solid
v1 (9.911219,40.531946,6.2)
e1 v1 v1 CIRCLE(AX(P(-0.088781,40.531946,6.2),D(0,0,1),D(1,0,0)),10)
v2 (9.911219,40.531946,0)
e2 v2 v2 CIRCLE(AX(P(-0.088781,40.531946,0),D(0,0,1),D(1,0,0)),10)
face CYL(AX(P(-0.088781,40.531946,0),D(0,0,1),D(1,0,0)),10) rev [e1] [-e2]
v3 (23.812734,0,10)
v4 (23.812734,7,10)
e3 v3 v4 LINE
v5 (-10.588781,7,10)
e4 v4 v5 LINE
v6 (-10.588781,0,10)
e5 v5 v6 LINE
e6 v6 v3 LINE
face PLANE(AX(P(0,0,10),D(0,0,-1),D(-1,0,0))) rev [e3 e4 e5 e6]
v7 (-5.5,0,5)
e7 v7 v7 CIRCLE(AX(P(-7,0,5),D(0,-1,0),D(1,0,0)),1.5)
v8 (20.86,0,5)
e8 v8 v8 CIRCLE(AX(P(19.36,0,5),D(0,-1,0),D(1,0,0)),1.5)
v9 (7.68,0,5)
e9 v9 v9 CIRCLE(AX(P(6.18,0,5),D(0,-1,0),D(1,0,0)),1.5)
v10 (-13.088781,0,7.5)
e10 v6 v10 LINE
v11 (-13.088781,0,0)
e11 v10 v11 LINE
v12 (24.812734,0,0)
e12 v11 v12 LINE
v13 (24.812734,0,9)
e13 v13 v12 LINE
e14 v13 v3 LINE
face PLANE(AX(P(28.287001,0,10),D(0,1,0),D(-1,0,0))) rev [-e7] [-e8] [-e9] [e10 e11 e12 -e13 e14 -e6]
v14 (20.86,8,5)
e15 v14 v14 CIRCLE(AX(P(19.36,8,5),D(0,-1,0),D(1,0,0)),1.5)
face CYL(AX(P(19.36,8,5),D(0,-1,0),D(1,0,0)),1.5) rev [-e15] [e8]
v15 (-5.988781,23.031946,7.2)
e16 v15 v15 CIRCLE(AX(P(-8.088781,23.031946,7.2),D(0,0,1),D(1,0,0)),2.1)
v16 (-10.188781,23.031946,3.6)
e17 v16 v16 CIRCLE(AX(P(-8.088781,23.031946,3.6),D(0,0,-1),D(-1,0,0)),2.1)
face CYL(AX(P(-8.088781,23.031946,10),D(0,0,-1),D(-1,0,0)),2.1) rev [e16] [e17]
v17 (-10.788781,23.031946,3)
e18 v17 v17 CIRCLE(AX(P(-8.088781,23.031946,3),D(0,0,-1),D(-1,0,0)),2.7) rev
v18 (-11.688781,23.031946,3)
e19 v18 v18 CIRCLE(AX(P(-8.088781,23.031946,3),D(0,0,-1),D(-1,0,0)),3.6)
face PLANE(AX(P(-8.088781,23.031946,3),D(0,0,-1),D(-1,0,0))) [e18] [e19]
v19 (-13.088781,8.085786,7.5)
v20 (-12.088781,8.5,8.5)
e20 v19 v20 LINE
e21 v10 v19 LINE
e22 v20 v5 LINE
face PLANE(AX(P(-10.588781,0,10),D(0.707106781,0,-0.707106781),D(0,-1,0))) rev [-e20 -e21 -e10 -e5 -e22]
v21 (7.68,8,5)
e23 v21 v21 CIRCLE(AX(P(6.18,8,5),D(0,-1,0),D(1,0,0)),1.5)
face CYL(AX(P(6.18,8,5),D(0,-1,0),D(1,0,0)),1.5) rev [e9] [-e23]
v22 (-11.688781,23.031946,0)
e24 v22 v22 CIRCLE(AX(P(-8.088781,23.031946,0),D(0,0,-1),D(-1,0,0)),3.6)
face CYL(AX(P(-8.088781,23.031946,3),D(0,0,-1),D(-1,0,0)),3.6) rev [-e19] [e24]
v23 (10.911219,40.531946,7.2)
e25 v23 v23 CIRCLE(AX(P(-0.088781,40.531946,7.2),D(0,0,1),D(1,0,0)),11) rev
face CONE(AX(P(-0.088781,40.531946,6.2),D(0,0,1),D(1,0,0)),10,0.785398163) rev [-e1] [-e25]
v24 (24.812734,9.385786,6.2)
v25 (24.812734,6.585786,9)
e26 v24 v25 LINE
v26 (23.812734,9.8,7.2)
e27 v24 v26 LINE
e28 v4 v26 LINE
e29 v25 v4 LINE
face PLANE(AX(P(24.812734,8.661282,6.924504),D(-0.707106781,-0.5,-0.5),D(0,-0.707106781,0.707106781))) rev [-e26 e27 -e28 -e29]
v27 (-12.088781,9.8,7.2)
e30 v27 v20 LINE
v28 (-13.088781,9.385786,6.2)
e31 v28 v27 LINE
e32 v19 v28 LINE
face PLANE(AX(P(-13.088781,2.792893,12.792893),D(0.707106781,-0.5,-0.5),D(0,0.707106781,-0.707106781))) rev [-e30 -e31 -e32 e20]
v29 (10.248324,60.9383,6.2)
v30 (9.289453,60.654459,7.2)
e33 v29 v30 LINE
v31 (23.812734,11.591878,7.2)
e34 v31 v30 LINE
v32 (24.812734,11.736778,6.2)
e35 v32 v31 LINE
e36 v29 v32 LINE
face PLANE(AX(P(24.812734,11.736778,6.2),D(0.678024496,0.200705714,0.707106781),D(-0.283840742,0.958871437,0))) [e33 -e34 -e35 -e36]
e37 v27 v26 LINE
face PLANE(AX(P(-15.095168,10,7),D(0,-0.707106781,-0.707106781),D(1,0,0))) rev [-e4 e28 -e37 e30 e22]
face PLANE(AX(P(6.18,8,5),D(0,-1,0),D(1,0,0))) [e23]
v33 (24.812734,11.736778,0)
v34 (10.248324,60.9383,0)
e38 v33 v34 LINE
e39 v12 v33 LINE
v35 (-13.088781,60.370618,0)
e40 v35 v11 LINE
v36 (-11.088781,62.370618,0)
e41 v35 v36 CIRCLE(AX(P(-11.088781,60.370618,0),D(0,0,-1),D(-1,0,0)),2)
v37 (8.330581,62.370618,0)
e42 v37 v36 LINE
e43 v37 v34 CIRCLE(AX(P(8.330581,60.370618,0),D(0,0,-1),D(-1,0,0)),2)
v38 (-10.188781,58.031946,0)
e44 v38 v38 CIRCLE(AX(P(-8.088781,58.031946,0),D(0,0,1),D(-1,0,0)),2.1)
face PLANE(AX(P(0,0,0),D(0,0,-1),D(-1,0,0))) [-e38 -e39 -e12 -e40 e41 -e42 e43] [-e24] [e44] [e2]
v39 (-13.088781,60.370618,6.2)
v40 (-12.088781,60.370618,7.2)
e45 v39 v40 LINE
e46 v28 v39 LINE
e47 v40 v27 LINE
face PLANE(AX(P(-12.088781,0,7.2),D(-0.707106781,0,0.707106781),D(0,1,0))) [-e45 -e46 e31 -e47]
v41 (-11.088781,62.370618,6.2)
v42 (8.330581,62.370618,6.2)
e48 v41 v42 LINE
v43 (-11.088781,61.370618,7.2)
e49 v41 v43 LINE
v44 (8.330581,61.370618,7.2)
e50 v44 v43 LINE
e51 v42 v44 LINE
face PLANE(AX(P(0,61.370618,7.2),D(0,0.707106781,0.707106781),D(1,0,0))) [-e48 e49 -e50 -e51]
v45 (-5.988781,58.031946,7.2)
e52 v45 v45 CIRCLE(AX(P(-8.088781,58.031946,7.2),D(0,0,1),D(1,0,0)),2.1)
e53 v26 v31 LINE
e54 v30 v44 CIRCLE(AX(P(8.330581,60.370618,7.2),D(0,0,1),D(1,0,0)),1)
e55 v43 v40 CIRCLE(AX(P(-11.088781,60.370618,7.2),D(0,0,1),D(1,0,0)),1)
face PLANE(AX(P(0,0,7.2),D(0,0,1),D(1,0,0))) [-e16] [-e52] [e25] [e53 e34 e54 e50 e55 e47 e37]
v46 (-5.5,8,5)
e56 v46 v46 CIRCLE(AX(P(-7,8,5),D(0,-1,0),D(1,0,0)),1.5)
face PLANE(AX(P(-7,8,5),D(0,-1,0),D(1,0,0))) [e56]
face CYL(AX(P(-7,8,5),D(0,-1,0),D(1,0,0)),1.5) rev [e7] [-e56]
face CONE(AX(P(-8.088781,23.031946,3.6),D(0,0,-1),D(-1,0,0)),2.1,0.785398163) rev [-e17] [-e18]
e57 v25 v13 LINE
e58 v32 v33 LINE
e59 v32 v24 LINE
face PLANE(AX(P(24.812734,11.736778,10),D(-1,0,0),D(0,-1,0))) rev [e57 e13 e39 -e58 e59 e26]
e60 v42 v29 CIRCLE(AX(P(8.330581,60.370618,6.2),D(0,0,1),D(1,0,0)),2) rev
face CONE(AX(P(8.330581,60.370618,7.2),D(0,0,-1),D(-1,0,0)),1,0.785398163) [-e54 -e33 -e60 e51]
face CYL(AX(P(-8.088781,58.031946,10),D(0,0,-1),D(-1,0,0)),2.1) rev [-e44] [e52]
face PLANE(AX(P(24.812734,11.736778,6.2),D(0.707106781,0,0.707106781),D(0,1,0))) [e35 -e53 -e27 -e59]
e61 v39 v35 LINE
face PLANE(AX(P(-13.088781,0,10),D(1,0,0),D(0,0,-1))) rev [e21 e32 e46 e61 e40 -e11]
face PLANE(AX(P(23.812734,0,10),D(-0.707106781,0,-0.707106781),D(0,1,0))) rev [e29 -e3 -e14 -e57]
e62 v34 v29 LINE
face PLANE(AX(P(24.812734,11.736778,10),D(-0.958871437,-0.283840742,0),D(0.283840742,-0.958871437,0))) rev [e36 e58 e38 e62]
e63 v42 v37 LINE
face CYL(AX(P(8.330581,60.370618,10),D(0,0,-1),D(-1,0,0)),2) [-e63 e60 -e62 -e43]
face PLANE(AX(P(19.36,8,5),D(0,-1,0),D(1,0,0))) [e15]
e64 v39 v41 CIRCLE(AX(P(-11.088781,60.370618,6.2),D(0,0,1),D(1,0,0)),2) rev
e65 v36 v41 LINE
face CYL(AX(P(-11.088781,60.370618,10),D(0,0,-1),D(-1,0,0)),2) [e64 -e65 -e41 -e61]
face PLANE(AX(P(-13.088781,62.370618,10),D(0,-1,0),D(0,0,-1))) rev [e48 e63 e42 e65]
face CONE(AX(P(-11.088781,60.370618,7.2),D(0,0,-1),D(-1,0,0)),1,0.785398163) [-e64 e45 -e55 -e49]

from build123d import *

# Parameters (mm, degrees)
SKIZZE1_R                            = 2.1
AUFSATZ_LINEAR_AUSTRAGEN1_DEPTH      = 10
SKIZZE2_R                            = 1.5
SCHNITT_LINEAR_AUSTRAGEN1_DEPTH      = 8
SCHNITT_LINEAR_AUSTRAGEN3_DEPTH      = 2.8
SCHNITT_LINEAR_AUSTRAGEN5_DEPTH      = 69.862823313
SCHNITT_LINEAR_AUSTRAGEN5_DEPTH_BACK = 69.862823313
SKIZZE7_R                            = 10
FASE1_SIZE                           = 3
SCHNITT_LINEAR_AUSTRAGEN4_DEPTH      = 10
VERRUNDUNG1_R                        = 2
FASE2_SIZE                           = 1
FASE3_SIZE                           = 2.5
SKIZZE8_R                            = 3.6
SCHNITT_LINEAR_AUSTRAGEN6_DEPTH      = 3
FASE4_SIZE                           = 0.6


with BuildPart() as part:
    # Skizze1 → Aufsatz-Linear austragen1 (new body)
    with BuildSketch(Plane.XY):
        Polygon((28.287001282, 57.370618027), (28.287001282, 0), (-13.088781156, 0), (-13.088781156, 27.348243657), (-13.088781156, 53.715647777), (-13.088781156, 57.370618027), (-13.088781156, 62.370618027), (28.287001282, 62.370618027), align=None)
        with Locations((-8.088781156, 23.031945717)):
            Circle(SKIZZE1_R, mode=Mode.SUBTRACT)
        with Locations(Location((-8.088781156, 58.031945717, 0), (0, 0, 180))):
            Circle(SKIZZE1_R, mode=Mode.SUBTRACT)
    extrude(amount=AUFSATZ_LINEAR_AUSTRAGEN1_DEPTH)

    # Skizze2 → Schnitt-Linear austragen1 (cut)
    with BuildSketch(Plane.XZ):
        with Locations((-7, 5)):
            Circle(SKIZZE2_R)
        with Locations((6.18, 5)):
            Circle(SKIZZE2_R)
        with Locations((19.36, 5)):
            Circle(SKIZZE2_R)
    extrude(amount=-SCHNITT_LINEAR_AUSTRAGEN1_DEPTH, mode=Mode.SUBTRACT)

    # Skizze4 → Schnitt-Linear austragen3 (cut)
    with BuildSketch(Plane.XY.offset(10)):
        Polygon((-15.095168359, 10), (28.287001282, 10), (36.093332102, 46.989971623), (30.429094825, 65.957451721), (-16.081030445, 65.957451721), (-16.081030445, 27.753515123), align=None)
    extrude(amount=-SCHNITT_LINEAR_AUSTRAGEN3_DEPTH, mode=Mode.SUBTRACT)

    # Skizze7 → Schnitt-Linear austragen5 (cut, two sides: drawn at the far end of the back side and taken through both)
    with BuildSketch(Plane.XY.offset(7.2).offset(-SCHNITT_LINEAR_AUSTRAGEN5_DEPTH_BACK)):
        with Locations((-0.088781156, 40.531945717)):
            Circle(SKIZZE7_R)
    extrude(amount=SCHNITT_LINEAR_AUSTRAGEN5_DEPTH + SCHNITT_LINEAR_AUSTRAGEN5_DEPTH_BACK, mode=Mode.SUBTRACT)

    # Fase1
    # the kernel refuses this chamfer: 3 mm, written as the material it takes off along each edge
    with BuildSketch(Plane(origin=(-20.80383012, 10, 10), x_dir=(0, -0.9996219169112969, 0.027495876610586202), z_dir=(1, 0, 0))) as fase1_piece_1_section:
        Polygon((FASE1_SIZE * 0.999621916911, FASE1_SIZE * 0.0274958766106), (-FASE1_SIZE * 0.0274958766106, FASE1_SIZE * 0.999621916911), (0, 0), align=None)
    fase1_piece_1 = extrude(amount=56.805880365, mode=Mode.PRIVATE)
    fase1_piece_1 = split(fase1_piece_1, bisect_by=Plane(origin=(7.599110063, 8.999392985, 7.2), z_dir=(0, 0, 1)), keep=Keep.TOP, mode=Mode.PRIVATE)
    add(fase1_piece_1, mode=Mode.SUBTRACT)

    # Skizze5 → Schnitt-Linear austragen4 (cut)
    with BuildSketch(Plane(origin=(0, 0, 0), x_dir=(-1, 0, 0), z_dir=(0, 0, -1))):
        Polygon((-24.81273389, 11.736777957), (-9.824335871, 62.370618027), (-28.287001282, 62.370618027), (-28.287001282, 0), (-24.81273389, 0), align=None)
    extrude(amount=-SCHNITT_LINEAR_AUSTRAGEN4_DEPTH, mode=Mode.SUBTRACT)

    # Verrundung1
    verrundung1_edges = [part.edges().sort_by_distance(p)[0] for p in [
        (9.824335871, 62.370618027, 3.6),
        (-13.088781156, 62.370618027, 3.6),
    ]]
    fillet(verrundung1_edges, radius=VERRUNDUNG1_R)

    # Fase2
    fase2_edges = [part.edges().sort_by_distance(p)[0] for p in [
        (24.81273389, 10.768388979, 7.2),
        (24.81273389, 3.5, 10),
        (-13.088781156, 35.085309014, 7.2),
        (-1.379099888, 62.370618027, 7.2),
        (17.530529072, 36.337538735, 7.2),
        (9.527376482, 61.973016693, 7.2),
        (-12.502994718, 61.78483159, 7.2),
        (-10.088781156, 40.531945717, 7.2),
        (-13.088781156, 8.4, 8.6),
        (24.81273389, 8.4, 8.6),
    ]]
    chamfer(fase2_edges, length=FASE2_SIZE)

    # Fase3
    fase3_edges = [part.edges().sort_by_distance(p)[0] for p in [
        (-13.088781156, 2.792893219, 10),
    ]]
    chamfer(fase3_edges, length=FASE3_SIZE)

    # Skizze8 → Schnitt-Linear austragen6 (cut)
    with BuildSketch(Plane(origin=(0, 0, 0), x_dir=(-1, 0, 0), z_dir=(0, 0, -1))):
        with Locations((8.088781156, 23.031945717)):
            Circle(SKIZZE8_R)
    extrude(amount=-SCHNITT_LINEAR_AUSTRAGEN6_DEPTH, mode=Mode.SUBTRACT)

    # Fase4
    fase4_edges = [part.edges().sort_by_distance(p)[0] for p in [
        (-10.188781156, 23.031945717, 3),
    ]]
    chamfer(fase4_edges, length=FASE4_SIZE)


solid = part.part
